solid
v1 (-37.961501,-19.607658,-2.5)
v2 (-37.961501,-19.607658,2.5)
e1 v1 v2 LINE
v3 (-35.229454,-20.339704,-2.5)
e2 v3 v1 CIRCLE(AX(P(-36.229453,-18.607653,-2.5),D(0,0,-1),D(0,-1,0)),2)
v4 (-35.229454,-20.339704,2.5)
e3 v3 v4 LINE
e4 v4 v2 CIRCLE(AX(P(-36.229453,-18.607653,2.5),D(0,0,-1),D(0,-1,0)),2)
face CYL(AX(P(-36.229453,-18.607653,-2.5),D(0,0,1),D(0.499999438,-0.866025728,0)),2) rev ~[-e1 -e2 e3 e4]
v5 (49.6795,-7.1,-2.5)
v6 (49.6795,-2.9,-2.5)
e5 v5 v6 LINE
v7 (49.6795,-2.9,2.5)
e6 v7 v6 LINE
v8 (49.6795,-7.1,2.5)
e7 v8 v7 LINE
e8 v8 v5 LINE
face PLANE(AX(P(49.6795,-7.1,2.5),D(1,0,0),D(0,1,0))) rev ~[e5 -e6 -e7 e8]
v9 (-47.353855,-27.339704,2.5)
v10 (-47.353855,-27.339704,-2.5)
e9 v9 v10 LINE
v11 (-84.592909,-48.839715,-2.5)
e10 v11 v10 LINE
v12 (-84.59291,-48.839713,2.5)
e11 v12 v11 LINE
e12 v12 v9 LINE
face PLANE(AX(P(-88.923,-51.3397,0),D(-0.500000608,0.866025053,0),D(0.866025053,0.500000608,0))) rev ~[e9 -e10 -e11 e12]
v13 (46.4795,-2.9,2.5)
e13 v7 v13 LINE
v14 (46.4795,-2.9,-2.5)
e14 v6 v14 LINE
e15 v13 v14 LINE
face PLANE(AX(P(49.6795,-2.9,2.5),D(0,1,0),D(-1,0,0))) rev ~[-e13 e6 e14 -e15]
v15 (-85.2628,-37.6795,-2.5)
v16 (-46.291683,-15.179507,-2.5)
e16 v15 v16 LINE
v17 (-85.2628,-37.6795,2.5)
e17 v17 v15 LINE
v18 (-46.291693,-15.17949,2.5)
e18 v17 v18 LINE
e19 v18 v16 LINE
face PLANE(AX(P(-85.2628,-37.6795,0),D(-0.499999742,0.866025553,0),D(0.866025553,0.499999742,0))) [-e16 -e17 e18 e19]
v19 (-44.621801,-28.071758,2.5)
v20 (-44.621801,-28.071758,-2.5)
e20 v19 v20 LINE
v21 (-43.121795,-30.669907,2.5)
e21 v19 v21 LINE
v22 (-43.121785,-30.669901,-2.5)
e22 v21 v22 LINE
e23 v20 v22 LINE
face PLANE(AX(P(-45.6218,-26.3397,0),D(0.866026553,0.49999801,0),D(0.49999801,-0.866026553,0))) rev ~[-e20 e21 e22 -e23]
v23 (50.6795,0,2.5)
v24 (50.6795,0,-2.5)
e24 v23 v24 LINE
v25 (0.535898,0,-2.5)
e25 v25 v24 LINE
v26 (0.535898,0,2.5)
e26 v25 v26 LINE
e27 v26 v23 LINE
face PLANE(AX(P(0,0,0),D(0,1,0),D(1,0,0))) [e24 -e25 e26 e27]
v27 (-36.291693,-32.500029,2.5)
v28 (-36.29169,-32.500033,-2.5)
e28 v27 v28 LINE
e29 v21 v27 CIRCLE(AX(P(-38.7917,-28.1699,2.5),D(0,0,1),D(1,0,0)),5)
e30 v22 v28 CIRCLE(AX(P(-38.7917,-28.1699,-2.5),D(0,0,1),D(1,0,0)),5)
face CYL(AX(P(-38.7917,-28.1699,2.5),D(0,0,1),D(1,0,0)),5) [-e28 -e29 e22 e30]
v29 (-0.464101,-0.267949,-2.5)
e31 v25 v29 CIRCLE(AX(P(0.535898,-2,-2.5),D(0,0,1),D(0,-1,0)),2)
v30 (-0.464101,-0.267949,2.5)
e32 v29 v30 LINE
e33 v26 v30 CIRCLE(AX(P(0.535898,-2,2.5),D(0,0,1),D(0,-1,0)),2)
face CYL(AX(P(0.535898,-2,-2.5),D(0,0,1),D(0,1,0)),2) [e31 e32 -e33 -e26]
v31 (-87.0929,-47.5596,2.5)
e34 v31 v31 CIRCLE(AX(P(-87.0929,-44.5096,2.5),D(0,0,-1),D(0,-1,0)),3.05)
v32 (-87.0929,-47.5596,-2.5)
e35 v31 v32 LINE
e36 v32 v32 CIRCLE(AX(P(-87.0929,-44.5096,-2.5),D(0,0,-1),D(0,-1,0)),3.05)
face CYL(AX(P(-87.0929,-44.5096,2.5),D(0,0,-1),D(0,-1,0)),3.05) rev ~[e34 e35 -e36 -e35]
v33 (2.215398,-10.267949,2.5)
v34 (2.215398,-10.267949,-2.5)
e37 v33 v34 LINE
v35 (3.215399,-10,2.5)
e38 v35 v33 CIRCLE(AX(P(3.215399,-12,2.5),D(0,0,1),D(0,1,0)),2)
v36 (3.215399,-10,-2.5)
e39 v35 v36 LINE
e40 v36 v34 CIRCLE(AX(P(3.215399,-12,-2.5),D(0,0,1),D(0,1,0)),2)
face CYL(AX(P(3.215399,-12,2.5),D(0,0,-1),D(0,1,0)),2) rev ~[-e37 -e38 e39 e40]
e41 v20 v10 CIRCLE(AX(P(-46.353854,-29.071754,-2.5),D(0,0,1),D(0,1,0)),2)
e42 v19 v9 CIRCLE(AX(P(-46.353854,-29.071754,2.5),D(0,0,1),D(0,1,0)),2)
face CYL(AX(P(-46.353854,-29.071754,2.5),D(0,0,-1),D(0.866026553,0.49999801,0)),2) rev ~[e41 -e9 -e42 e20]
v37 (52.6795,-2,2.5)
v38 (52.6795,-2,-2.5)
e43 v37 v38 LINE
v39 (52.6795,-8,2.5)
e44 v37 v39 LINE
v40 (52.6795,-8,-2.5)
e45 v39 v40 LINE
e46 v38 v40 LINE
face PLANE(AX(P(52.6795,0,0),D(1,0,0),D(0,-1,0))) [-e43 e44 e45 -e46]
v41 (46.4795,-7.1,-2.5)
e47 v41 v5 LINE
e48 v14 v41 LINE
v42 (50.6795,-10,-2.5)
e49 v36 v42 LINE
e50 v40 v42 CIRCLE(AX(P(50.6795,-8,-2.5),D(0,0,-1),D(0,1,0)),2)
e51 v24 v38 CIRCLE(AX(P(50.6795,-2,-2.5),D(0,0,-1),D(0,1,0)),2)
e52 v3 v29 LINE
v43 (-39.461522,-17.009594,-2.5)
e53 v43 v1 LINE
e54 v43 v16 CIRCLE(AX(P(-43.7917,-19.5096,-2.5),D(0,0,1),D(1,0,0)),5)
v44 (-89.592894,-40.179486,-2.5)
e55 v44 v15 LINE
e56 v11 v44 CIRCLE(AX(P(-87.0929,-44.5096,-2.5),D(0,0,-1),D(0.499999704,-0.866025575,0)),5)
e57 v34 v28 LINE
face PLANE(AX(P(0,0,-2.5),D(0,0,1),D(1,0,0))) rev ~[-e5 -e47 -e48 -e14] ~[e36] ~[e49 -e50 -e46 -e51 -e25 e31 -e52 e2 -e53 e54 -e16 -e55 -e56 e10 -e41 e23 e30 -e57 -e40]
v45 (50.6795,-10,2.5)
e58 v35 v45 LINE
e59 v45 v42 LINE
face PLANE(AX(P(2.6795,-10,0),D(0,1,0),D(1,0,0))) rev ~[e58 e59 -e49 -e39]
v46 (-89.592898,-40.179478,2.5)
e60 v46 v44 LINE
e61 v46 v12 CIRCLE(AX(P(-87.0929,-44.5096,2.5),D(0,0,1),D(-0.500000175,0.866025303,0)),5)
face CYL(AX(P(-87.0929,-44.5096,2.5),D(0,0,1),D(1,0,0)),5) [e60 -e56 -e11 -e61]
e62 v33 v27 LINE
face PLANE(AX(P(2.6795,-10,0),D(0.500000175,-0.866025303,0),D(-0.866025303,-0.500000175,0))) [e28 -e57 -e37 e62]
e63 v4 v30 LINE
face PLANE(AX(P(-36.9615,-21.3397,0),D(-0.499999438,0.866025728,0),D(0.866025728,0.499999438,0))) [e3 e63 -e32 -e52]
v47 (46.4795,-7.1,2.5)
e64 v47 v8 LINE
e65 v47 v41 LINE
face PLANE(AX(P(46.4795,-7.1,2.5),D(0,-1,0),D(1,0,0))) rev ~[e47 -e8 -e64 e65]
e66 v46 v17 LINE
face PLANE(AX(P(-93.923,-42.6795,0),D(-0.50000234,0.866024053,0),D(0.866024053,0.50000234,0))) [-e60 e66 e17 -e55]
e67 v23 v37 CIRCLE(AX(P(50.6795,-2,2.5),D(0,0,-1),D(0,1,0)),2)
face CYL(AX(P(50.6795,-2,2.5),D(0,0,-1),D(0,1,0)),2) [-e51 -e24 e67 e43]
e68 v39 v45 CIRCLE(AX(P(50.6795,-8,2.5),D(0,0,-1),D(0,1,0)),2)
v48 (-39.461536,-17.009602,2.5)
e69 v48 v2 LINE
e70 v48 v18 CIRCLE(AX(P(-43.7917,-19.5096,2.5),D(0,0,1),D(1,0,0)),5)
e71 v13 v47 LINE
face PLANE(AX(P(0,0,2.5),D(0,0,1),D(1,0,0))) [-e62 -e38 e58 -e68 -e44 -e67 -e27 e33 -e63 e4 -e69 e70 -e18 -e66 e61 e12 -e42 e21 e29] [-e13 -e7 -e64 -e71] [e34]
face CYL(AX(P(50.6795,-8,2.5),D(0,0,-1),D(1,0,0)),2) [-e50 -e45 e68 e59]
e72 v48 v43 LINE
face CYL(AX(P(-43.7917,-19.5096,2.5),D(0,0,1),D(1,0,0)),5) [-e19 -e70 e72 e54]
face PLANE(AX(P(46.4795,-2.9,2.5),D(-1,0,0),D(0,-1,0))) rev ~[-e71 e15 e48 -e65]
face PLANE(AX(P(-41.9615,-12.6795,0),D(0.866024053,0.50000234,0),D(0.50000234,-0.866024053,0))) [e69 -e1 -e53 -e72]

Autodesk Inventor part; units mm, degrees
ref_plane "YZ Plane" through (0, 0, 0) normal (1, 0, 0) x (0, 1, 0)
ref_plane "XZ Plane" through (0, 0, 0) normal (0, 1, 0) x (-1, 0, 0)
ref_plane "XY Plane" through (0, 0, 0) normal (0, 0, 1) x (1, 0, 0)
sketch "スケッチ1" plane through (0, 0, 0) normal (0, 0, 1) x (1, 0, 0)
  line L0 (0, 0) -> (52.6795, 0)
  line L1 (2.6795, -10) -> (52.6795, -10)
  line L2 (52.6795, 0) -> (52.6795, -10)
  line L3 (2.6795, -10) -> (-83.923, -60)
  line L4 (-36.9615, -21.3397) -> (0, 0)
  line L5 (-83.923, -60) -> (-93.923, -42.6795)
  line L6 (-93.923, -42.6795) -> (-85.2628, -37.6795)
  line L7 (-85.2628, -37.6795) -> (-41.9615, -12.6795)
  line L8 (-41.9615, -12.6795) -> (-36.9615, -21.3397)
  line L9 (-88.923, -51.3397) -> (-45.6218, -26.3397)
  line L10 (-45.6218, -26.3397) -> (-40.6218, -35)
  dimension "d1" = 50
  dimension "d2" = 10
  dimension "d3" = 100
  dimension "d4" = 150
  dimension "d5" = 10
  dimension "d6" = 20
  dimension "d42" = 60
  dimension "d43" = 50
  dimension "d44" = 10
extrude "押し出し1" add sketch "スケッチ1" along normal mid plane 5 contours L0 L2 L1 L3 L10 L9 L5 L6 L7 L8 L4
sketch "スケッチ2" plane through (0, 0, 2.5) normal (0, 0, 1) x (1, 0, 0)
  line L0 (46.4795, -7.1) -> (49.6795, -7.1)
  line L1 (49.6795, -7.1) -> (49.6795, -2.9)
  line L2 (49.6795, -2.9) -> (46.4795, -2.9)
  line L3 (46.4795, -2.9) -> (46.4795, -7.1)
  line L4 (46.4795, -7.1) -> (49.6795, -2.9) construction
  line L5 (49.6795, -7.1) -> (46.4795, -2.9) construction
  line L6 (52.6795, 0) -> (0, 0) projected
  line L7 (2.6795, -10) -> (52.6795, -10) projected
  line L8 (52.6795, -10) -> (52.6795, 0) projected
  point P0 (48.0795, -5)
  dimension "d14" = 3
  dimension "d15" = 3.2
  dimension "d64" = 4.2
  dimension "d65" = 2.9
extrude "押し出し2" cut sketch "スケッチ2" against normal blind 5
sketch "スケッチ5" plane through (0, 0, 2.5) normal (0, 0, 1) x (1, 0, 0)
  line L0 (-41.9615, -12.6795) -> (-93.923, -42.6795) projected
  line L1 (-93.923, -42.6795) -> (-88.923, -51.3397) projected
  circle A0 centre (-87.0929, -44.5096) radius 3.05
  point P0 (0, 0)
  dimension "d45" = 5
  dimension "d46" = 5
  dimension "d47" = 6.1
hole "穴3" at (-87.0929, -44.5096, 2.5) direction (0, 0, -1) diameter 6.1 end through all
fillet "フィレット2" radius 2 10 edges at (-93.923, -42.6795, 0) (-88.923, -51.3397, 0) (-41.9615, -12.6795, 0) (-36.9615, -21.3397, 0) (-40.6218, -35, 0) (-45.6218, -26.3397, 0) (2.6795, -10, 0) (0, 0, 0) (52.6795, 0, 0) (52.6795, -10, 0)
sketch "スケッチ6" plane through (0, 0, 2.5) normal (0, 0, 1) x (1, 0, 0)
  arc A0 (50.6795, -10) -> (52.6795, -8) centre (50.6795, -8) ccw projected
  line L0 (52.6795, -8) -> (52.6795, -2) projected
  arc A1 (52.6795, -2) -> (50.6795, 0) centre (50.6795, -2) ccw projected
  line L1 (50.6795, 0) -> (0.5359, 0) projected
  arc A2 (0.5359, 0) -> (-0.4641, -0.2679) centre (0.5359, -2) ccw projected
  line L2 (-0.4641, -0.2679) -> (-35.2295, -20.3397) projected
  arc A3 (-37.9615, -19.6077) -> (-35.2295, -20.3397) centre (-36.2295, -18.6077) ccw projected
  line L3 (-37.9615, -19.6077) -> (-40.9615, -14.4115) projected
  arc A4 (-40.9615, -14.4115) -> (-43.6936, -13.6795) centre (-42.6936, -15.4115) ccw projected
  line L4 (-43.6936, -13.6795) -> (-92.191, -41.6795) projected
  arc A5 (-92.191, -41.6795) -> (-92.923, -44.4115) centre (-91.191, -43.4115) ccw projected
  line L5 (-92.923, -44.4115) -> (-89.923, -49.6077) projected
  arc A6 (-89.923, -49.6077) -> (-87.191, -50.3397) centre (-88.191, -48.6077) ccw projected
  line L6 (-87.191, -50.3397) -> (-47.3538, -27.3397) projected
  arc A7 (-44.6218, -28.0718) -> (-47.3538, -27.3397) centre (-46.3538, -29.0718) ccw projected
  line L7 (-44.6218, -28.0718) -> (-41.6218, -33.2679) projected
  arc A8 (-41.6218, -33.2679) -> (-38.8897, -34) centre (-39.8897, -32.2679) ccw projected
  line L8 (-38.8897, -34) -> (2.2154, -10.2679) projected
  arc A9 (3.2154, -10) -> (2.2154, -10.2679) centre (3.2154, -12) ccw projected
  line L9 (3.2154, -10) -> (50.6795, -10) projected
  circle A10 centre (-87.0929, -44.5096) radius 3.05 projected
  line L10 (46.4795, -2.9) -> (49.6795, -2.9) projected
  line L11 (49.6795, -2.9) -> (49.6795, -7.1) projected
  line L12 (49.6795, -7.1) -> (46.4795, -7.1) projected
  line L13 (46.4795, -7.1) -> (46.4795, -2.9) projected
  circle A11 centre (-87.0929, -44.5096) radius 5
  point P0 (0, 0)
  point P1 (-84.5929, -48.8397)
  point P2 (-91.423, -47.0096)
  point P3 (-89.5929, -40.1795)
extrude "押し出し3" cut sketch "スケッチ6" against normal blind 10 contours L6 A6 L5 A11 | L5 A5 L4 A11
sketch "スケッチ7" plane through (0, 0, 2.5) normal (0, 0, 1) x (1, 0, 0)
  line L0 (-43.6936, -13.6795) -> (-89.5929, -40.1795) projected
  line L1 (-37.9615, -19.6077) -> (-40.9615, -14.4115) projected
  line L2 (-38.8897, -34) -> (2.2154, -10.2679) projected
  line L3 (-44.6218, -28.0718) -> (-41.6218, -33.2679) projected
  circle A0 centre (-43.7917, -19.5096) radius 5
  circle A1 centre (-38.7917, -28.1699) radius 5
  line L4 (46.4795, -2.9) -> (49.6795, -2.9) projected
  line L5 (49.6795, -2.9) -> (49.6795, -7.1) projected
  line L6 (49.6795, -7.1) -> (46.4795, -7.1) projected
  line L7 (46.4795, -7.1) -> (46.4795, -2.9) projected
  circle A2 centre (-87.0929, -44.5096) radius 3.05 projected
  arc A3 (-89.5929, -40.1795) -> (-84.5929, -48.8397) centre (-87.0929, -44.5096) ccw projected
  line L8 (-84.5929, -48.8397) -> (-47.3538, -27.3397) projected
  arc A4 (-44.6218, -28.0718) -> (-47.3538, -27.3397) centre (-46.3538, -29.0718) ccw projected
  line L9 (-44.6218, -28.0718) -> (-41.6218, -33.2679) projected
  arc A5 (-41.6218, -33.2679) -> (-38.8897, -34) centre (-39.8897, -32.2679) ccw projected
  line L10 (-38.8897, -34) -> (2.2154, -10.2679) projected
  arc A6 (3.2154, -10) -> (2.2154, -10.2679) centre (3.2154, -12) ccw projected
  line L11 (3.2154, -10) -> (50.6795, -10) projected
  arc A7 (50.6795, -10) -> (52.6795, -8) centre (50.6795, -8) ccw projected
  line L12 (52.6795, -8) -> (52.6795, -2) projected
  arc A8 (52.6795, -2) -> (50.6795, 0) centre (50.6795, -2) ccw projected
  line L13 (50.6795, 0) -> (0.5359, 0) projected
  arc A9 (0.5359, 0) -> (-0.4641, -0.2679) centre (0.5359, -2) ccw projected
  line L14 (-0.4641, -0.2679) -> (-35.2295, -20.3397) projected
  arc A10 (-37.9615, -19.6077) -> (-35.2295, -20.3397) centre (-36.2295, -18.6077) ccw projected
  line L15 (-37.9615, -19.6077) -> (-40.9615, -14.4115) projected
  arc A11 (-40.9615, -14.4115) -> (-43.6936, -13.6795) centre (-42.6936, -15.4115) ccw projected
  line L16 (-43.6936, -13.6795) -> (-89.5929, -40.1795) projected
  point P0 (0, 0)
  point P1 (-36.2917, -32.5)
  point P2 (-43.1218, -30.6699)
  point P3 (-46.2917, -15.1795)
  point P4 (-39.4615, -17.0096)
  dimension "d58" = 5
  dimension "d59" = 5
  dimension "d60" = 5
  dimension "d61" = 5
extrude "押し出し4" cut sketch "スケッチ7" against normal blind 10 contours A11 L1 A0 L0 | A1 L2 A5 L3
equation "\"d46\" = d45"
equation "\"d59\" = d58"
equation "\"d60\" = d58"
equation "\"d61\" = d58"
properties part number "茎固定パーツ"
